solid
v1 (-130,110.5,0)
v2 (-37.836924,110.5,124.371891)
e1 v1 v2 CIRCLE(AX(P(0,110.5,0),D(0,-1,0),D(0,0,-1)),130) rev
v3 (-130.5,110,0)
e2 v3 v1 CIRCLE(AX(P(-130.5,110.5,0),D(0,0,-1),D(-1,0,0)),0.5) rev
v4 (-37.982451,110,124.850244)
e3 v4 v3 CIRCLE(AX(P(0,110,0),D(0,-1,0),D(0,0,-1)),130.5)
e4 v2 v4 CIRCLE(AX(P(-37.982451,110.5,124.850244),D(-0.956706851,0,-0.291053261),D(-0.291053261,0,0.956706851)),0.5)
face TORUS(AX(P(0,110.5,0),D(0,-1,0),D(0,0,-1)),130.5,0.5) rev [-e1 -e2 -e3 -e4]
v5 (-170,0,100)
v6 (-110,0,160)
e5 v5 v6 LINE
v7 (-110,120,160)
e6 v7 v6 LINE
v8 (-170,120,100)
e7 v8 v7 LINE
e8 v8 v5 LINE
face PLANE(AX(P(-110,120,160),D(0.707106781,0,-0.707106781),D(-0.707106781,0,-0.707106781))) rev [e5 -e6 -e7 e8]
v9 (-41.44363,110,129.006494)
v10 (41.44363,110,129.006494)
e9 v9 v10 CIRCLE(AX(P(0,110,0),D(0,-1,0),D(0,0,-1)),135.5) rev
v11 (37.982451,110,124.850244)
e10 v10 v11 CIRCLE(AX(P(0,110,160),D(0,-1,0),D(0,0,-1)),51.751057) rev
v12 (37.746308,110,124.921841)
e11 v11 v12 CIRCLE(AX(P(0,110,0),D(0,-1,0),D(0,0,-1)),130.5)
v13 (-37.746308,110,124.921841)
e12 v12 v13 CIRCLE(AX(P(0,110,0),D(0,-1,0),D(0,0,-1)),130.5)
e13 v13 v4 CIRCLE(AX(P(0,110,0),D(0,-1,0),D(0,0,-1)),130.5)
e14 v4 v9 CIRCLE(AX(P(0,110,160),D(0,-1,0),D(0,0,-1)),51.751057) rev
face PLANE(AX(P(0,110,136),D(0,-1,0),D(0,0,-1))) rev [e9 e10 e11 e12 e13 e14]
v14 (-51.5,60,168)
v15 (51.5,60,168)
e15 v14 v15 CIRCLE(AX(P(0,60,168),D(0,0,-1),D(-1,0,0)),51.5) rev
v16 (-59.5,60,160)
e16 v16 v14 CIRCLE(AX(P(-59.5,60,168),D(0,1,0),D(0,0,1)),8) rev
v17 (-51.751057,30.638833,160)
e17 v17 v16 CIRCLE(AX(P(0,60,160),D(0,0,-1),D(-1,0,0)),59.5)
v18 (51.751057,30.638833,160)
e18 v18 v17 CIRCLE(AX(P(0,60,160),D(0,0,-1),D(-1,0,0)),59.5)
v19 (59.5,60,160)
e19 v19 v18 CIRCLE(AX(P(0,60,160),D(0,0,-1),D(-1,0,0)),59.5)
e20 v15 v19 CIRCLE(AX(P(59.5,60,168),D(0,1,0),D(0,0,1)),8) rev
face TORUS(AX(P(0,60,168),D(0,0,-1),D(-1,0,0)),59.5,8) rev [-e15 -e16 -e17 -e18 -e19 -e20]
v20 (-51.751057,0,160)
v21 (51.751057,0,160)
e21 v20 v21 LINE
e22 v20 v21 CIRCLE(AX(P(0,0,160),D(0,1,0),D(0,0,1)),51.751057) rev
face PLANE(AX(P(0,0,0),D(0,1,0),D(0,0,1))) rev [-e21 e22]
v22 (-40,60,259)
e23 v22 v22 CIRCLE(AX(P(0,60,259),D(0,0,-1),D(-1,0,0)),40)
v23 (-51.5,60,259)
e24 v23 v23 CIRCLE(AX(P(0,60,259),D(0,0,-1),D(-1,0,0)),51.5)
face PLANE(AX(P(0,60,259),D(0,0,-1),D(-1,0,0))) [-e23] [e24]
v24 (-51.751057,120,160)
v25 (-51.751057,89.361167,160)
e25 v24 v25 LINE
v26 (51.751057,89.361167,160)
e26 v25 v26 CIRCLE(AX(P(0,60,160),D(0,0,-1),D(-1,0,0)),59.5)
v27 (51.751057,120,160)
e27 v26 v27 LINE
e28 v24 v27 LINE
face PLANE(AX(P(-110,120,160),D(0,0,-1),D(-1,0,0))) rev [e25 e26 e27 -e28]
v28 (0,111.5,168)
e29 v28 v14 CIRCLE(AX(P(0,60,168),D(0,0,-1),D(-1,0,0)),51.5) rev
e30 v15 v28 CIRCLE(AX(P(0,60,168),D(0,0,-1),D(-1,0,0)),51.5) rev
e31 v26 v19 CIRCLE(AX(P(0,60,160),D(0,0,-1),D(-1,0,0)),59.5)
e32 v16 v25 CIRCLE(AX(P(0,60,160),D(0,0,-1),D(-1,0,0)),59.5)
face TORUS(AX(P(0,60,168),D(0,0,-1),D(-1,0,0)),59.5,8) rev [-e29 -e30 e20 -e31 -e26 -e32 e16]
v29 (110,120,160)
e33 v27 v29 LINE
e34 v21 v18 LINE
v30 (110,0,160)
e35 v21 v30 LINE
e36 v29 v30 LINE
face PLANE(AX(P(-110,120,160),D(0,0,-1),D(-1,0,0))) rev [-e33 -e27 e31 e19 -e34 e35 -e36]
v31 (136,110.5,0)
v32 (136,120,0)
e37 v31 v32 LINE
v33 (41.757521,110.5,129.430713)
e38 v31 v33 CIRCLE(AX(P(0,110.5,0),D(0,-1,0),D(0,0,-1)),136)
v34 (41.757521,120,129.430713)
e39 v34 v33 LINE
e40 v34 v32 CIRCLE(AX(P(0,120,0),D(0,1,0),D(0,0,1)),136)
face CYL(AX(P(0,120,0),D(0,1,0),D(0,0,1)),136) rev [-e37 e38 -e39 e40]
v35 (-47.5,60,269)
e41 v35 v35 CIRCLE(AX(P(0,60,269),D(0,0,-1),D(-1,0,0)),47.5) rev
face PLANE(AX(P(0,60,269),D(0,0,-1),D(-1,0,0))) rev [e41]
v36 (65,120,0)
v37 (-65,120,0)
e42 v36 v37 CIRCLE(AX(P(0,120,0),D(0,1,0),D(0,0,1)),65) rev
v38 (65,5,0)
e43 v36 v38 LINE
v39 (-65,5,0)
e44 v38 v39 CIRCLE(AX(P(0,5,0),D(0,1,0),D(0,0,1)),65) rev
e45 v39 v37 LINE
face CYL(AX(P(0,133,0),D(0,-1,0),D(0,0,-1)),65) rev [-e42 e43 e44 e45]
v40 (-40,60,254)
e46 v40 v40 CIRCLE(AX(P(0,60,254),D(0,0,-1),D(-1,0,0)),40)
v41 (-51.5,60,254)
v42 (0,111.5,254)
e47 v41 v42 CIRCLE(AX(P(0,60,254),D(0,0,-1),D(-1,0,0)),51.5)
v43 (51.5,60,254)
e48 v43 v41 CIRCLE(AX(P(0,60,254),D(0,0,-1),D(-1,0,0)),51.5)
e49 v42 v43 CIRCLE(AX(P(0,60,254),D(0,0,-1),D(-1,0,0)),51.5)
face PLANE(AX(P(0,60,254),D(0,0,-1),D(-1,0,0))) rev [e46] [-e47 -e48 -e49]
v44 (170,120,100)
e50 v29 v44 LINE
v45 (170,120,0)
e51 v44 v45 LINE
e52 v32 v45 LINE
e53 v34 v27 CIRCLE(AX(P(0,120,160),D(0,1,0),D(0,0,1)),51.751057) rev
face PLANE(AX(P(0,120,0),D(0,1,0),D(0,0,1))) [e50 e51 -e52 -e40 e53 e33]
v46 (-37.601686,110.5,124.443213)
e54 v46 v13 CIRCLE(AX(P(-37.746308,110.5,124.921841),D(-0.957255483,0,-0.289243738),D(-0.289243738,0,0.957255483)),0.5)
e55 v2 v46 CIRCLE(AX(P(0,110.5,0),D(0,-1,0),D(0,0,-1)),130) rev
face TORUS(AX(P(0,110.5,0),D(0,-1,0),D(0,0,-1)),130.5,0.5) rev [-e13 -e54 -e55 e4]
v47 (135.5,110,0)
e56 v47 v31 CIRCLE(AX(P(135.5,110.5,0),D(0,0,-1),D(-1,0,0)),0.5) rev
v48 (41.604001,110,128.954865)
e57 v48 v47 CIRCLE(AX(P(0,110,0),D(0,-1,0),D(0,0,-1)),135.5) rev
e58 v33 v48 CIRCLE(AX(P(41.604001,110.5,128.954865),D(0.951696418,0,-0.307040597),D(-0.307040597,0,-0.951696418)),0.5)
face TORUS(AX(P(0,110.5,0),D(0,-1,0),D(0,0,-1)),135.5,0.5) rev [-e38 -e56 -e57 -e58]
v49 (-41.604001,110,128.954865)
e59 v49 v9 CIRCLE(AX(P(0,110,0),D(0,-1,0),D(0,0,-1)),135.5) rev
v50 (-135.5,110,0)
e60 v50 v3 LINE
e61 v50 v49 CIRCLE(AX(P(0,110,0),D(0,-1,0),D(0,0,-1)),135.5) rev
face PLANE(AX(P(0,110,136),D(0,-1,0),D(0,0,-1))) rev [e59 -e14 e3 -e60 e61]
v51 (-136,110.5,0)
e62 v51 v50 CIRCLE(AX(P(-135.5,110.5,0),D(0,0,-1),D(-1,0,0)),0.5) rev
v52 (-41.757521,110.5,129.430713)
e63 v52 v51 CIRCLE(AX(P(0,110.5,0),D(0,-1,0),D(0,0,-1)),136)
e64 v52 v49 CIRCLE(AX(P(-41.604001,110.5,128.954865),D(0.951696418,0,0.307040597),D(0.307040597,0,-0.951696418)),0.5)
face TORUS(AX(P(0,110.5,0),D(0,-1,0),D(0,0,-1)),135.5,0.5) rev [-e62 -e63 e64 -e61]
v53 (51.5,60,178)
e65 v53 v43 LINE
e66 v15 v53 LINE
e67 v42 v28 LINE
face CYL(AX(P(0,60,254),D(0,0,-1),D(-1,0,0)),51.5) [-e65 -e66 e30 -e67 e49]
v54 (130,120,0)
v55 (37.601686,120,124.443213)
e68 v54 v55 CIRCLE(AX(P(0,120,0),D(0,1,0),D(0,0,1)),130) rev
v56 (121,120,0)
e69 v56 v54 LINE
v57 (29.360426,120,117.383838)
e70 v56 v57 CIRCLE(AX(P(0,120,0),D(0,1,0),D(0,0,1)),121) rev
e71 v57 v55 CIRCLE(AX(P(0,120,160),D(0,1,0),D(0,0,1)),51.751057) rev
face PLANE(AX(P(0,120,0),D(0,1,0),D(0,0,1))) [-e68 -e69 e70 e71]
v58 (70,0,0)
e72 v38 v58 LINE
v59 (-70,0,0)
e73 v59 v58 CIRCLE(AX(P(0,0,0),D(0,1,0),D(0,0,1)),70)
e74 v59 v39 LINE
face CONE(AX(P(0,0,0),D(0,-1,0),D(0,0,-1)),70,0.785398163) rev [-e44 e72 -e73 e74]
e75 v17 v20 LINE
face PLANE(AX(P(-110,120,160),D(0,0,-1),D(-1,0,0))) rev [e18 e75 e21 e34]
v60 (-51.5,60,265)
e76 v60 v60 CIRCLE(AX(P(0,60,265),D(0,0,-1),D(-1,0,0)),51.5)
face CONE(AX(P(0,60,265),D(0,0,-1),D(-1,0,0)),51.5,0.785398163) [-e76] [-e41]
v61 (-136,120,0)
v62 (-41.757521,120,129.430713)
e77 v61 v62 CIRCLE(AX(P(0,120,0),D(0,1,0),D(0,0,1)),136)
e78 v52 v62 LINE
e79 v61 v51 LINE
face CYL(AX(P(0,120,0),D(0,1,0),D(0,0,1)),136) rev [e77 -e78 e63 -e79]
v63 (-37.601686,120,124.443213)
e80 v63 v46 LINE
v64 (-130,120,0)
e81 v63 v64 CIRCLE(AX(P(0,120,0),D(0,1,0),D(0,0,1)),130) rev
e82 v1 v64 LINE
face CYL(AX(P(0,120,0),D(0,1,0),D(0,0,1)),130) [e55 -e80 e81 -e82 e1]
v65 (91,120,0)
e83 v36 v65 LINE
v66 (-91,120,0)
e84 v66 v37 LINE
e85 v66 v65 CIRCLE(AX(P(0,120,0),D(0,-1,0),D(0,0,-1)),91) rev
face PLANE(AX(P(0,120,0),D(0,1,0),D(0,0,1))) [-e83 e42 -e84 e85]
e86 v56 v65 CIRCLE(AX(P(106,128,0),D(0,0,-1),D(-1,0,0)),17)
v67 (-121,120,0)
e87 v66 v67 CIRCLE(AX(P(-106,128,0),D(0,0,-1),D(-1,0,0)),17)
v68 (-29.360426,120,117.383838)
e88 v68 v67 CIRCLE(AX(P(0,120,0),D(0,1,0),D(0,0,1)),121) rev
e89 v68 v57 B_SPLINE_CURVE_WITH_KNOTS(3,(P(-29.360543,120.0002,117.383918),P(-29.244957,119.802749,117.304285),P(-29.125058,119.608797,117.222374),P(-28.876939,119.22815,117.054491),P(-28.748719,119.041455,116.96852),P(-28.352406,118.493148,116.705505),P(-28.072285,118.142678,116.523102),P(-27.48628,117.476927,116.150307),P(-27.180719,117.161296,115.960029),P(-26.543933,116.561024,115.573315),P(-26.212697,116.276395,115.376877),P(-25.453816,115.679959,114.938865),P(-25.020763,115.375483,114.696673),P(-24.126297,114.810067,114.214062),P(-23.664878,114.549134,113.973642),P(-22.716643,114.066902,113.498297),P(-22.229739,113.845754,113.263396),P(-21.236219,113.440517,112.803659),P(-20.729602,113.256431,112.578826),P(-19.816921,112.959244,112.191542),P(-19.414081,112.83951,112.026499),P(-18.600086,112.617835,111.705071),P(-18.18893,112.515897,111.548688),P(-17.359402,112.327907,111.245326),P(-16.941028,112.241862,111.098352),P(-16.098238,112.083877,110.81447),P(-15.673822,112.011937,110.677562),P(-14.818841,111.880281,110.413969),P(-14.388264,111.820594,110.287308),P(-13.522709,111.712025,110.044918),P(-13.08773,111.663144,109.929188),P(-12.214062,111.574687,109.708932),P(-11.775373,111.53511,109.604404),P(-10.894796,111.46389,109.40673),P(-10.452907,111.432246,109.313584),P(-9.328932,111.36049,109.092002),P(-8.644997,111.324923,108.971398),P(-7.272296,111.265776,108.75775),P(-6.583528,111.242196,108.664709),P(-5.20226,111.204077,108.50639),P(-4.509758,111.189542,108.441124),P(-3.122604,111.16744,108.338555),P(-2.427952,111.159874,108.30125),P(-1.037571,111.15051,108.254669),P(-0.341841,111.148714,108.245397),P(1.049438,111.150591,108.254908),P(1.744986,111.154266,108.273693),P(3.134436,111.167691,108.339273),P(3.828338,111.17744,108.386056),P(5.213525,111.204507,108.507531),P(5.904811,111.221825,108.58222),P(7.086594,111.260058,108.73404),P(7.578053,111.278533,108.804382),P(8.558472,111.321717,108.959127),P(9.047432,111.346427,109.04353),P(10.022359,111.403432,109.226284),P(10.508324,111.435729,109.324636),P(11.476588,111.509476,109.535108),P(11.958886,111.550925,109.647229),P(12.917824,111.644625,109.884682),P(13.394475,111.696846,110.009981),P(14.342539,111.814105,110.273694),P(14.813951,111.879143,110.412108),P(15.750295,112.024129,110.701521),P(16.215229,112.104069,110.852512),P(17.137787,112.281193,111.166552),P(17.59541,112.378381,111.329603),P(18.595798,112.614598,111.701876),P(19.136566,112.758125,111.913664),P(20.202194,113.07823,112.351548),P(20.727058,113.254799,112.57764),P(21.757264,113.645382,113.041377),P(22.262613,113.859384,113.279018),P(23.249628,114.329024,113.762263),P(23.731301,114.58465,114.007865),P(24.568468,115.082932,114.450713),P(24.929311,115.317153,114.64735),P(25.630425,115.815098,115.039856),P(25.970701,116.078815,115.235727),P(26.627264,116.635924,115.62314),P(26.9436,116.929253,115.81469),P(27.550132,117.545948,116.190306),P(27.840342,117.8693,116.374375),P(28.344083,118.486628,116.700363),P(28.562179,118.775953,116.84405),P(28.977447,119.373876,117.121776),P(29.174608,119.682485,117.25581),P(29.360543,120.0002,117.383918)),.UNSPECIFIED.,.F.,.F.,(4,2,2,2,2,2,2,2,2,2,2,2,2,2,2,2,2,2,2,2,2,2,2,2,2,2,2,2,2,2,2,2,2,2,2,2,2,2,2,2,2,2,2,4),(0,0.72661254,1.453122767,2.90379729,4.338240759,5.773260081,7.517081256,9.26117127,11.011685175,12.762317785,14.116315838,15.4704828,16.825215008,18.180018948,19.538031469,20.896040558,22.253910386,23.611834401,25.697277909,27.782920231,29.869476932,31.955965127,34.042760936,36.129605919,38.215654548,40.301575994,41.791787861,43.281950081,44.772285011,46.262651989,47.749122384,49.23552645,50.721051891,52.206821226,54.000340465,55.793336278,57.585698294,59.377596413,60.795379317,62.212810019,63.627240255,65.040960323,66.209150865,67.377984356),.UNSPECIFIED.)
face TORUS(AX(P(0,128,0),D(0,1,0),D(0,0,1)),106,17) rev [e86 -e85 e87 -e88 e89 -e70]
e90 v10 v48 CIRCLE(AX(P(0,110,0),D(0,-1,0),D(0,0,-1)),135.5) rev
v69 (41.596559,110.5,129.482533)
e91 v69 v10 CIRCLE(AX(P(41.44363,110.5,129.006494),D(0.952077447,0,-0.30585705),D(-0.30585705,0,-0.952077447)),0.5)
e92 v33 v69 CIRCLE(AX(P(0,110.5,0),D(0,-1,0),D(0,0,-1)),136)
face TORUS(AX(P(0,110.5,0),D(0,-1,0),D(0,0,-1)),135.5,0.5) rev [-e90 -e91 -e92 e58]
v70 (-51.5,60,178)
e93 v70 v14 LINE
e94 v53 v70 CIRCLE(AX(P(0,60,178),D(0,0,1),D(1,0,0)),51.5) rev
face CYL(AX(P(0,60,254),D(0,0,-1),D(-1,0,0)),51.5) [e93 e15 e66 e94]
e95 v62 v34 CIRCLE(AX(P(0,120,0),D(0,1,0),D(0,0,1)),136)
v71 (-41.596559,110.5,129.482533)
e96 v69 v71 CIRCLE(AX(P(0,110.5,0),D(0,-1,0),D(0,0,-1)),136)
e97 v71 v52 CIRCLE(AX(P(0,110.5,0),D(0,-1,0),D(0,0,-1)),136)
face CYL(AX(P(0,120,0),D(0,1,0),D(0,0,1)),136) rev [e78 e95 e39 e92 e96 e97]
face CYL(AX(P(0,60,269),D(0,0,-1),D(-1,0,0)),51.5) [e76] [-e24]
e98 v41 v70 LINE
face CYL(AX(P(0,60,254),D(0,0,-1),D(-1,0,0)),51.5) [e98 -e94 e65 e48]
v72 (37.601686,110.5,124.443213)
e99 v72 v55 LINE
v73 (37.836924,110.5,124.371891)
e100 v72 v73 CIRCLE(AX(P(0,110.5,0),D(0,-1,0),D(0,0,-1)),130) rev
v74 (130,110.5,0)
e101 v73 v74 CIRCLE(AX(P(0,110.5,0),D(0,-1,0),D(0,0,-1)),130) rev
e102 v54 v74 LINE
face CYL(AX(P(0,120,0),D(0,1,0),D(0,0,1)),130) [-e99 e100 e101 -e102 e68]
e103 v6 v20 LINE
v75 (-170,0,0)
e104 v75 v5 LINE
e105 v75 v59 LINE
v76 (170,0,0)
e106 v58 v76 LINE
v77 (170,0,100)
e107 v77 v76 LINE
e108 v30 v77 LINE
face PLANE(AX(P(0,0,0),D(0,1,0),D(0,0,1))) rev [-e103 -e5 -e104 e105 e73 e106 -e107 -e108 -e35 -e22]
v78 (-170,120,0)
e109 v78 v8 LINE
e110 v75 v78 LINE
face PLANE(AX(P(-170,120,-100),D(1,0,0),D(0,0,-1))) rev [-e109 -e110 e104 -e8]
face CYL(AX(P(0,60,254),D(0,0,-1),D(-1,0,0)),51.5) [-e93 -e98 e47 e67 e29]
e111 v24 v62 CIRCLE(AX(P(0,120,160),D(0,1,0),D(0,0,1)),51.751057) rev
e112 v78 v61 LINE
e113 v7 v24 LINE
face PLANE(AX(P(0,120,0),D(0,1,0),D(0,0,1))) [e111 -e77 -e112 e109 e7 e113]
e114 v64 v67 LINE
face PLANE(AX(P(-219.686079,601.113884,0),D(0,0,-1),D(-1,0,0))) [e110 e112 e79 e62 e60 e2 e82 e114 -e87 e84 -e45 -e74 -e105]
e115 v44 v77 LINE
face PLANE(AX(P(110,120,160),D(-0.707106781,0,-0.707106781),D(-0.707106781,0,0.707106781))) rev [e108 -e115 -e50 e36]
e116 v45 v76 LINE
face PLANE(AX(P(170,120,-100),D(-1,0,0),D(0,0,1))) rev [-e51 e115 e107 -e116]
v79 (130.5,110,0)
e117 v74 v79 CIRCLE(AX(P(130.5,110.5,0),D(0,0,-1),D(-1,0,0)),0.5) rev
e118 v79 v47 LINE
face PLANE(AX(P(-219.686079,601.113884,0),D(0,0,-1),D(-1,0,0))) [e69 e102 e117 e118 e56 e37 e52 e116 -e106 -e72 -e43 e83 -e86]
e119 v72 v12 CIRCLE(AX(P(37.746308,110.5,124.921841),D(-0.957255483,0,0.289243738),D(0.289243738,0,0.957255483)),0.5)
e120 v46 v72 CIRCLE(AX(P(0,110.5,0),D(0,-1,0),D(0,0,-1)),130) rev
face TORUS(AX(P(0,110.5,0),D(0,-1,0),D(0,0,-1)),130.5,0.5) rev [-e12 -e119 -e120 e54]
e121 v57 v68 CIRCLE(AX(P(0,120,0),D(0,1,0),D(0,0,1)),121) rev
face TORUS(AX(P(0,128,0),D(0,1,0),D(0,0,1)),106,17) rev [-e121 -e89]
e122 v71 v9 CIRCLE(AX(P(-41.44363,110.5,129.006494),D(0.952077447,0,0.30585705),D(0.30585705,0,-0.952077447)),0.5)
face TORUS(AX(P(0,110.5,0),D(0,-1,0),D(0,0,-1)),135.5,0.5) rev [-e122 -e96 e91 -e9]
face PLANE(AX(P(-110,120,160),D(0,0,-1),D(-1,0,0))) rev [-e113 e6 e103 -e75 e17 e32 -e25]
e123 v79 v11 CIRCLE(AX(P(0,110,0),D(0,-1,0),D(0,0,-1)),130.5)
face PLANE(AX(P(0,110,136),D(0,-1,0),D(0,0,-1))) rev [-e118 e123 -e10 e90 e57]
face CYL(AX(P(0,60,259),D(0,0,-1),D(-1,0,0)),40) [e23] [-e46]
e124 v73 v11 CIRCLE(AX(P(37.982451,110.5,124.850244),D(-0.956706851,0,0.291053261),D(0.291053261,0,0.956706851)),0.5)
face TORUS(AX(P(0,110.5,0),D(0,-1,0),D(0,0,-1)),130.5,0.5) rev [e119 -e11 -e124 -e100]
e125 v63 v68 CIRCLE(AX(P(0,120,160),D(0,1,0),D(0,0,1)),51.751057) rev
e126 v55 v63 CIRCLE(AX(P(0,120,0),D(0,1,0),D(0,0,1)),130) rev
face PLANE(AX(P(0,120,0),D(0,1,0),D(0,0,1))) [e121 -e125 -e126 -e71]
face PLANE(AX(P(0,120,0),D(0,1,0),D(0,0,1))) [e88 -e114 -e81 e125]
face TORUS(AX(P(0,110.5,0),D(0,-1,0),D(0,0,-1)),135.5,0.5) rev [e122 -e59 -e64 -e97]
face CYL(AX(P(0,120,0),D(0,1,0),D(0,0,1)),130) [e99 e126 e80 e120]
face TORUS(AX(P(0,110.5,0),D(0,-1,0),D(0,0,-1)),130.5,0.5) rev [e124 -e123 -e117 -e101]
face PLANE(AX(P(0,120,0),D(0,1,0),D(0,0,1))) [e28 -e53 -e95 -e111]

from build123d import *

# Parameters (mm, degrees)
MAIN_DEPTH                = 120
PERNO1_START              = 160
PERNO1_OUTLINE_R          = 51.5
PERNO1_DEPTH              = 94
PERNO1_2_OUTLINE_R        = 65
PERNO1_2_DEPTH            = 120
SANALATURAPERNO_START     = 254
SKETCH4_3_R               = 40
SANALATURAPERNO_DEPTH     = 5
PERNO2_START              = 259
SKETCH4_4_R               = 51.5
SKETCH4_4_R_2             = 40
PERNO2_DEPTH              = 10
CHAMFER1_SIZE             = 4
FILLET2_R                 = 8
CHAMFER1_OF_MIRROR14_SIZE = 4
FILLET2_OF_MIRROR14_R     = 8
CHAMFER2_SIZE             = 5
PISTA_R                   = 17
SKETCH9_W                 = 397.156797082
SKETCH9_H                 = 271.545663618
CUT_EXTRUDE4_DEPTH        = 120
FILLET3_R                 = 0.5


# Read off the part's stored shape, not the designer's step: Perno1
with BuildPart() as part:
    # MainBody → Main (new body)
    with BuildSketch(Plane(origin=(0, 0, 0), x_dir=(1, 0, 0), z_dir=(0, 1, 0))):
        Polygon((-110, 160), (110, 160), (170, 100), (170, -100), (110, -160), (-110, -160), (-170, -100), (-170, 100), align=None)
    extrude(amount=MAIN_DEPTH)

    # Perno1 outline → Perno1 (add)
    with BuildSketch(Plane.XY.offset(PERNO1_START)):
        with Locations((0, 60)):
            Circle(PERNO1_OUTLINE_R)
    perno1 = extrude(amount=PERNO1_DEPTH)

    # Perno1 2 outline → Perno1 2 (cut)
    with BuildSketch(Plane(origin=(0, 0, 0), x_dir=(1, 0, 0), z_dir=(0, 1, 0))):
        Circle(PERNO1_2_OUTLINE_R)
    perno1_2 = extrude(amount=PERNO1_2_DEPTH, mode=Mode.SUBTRACT)

    # Sketch4<3> → SanalaturaPerno (add)
    with BuildSketch(Plane.XY.offset(SANALATURAPERNO_START)):
        with Locations(Location((0, 60, 0), (0, 0, 180))):
            Circle(SKETCH4_3_R)
    sanalaturaperno = extrude(amount=SANALATURAPERNO_DEPTH)

    # Sketch4<4> → Perno2 (add)
    # profile 1 of 2: a face of its own
    with BuildSketch(Plane.XY.offset(PERNO2_START)):
        with Locations(Location((0, 60, 0), (0, 0, 180))):
            Circle(SKETCH4_4_R)
        with Locations(Location((0, 60, 0), (0, 0, 180))):
            Circle(SKETCH4_4_R_2, mode=Mode.SUBTRACT)
    # profile 2 of 2: a face of its own
    with BuildSketch(Plane.XY.offset(PERNO2_START)):
        with Locations(Location((0, 60, 0), (0, 0, 180))):
            Circle(SKETCH4_4_R_2)
    perno2 = extrude(amount=PERNO2_DEPTH)

    # Chamfer1
    chamfer1_edges = [part.edges().sort_by_distance(p)[0] for p in [
        (51.5, 60, 269),
    ]]
    chamfer(chamfer1_edges, length=CHAMFER1_SIZE)

    # Fillet2
    fillet2_edges = [part.edges().sort_by_distance(p)[0] for p in [
        (-51.5, 60, 160),
    ]]
    fillet(fillet2_edges, radius=FILLET2_R)

    # Mirror14: Perno1, Perno1 2, SanalaturaPerno, Perno2 across plane
    add(perno1.mirror(Plane.XY))
    add(perno1_2.mirror(Plane.XY), mode=Mode.SUBTRACT)
    add(sanalaturaperno.mirror(Plane.XY))
    add(perno2.mirror(Plane.XY))

    # Chamfer1 of Mirror14
    chamfer1_of_mirror14_edges = [part.edges().sort_by_distance(p)[0] for p in [
        (51.5, 60, -269),
    ]]
    chamfer(chamfer1_of_mirror14_edges, length=CHAMFER1_OF_MIRROR14_SIZE)

    # Fillet2 of Mirror14
    fillet2_of_mirror14_edges = [part.edges().sort_by_distance(p)[0] for p in [
        (-51.5, 60, -160),
    ]]
    fillet(fillet2_of_mirror14_edges, radius=FILLET2_OF_MIRROR14_R)

    # Chamfer2
    chamfer2_edges = [part.edges().sort_by_distance(p)[0] for p in [
        (-65, 0, 0),
    ]]
    chamfer(chamfer2_edges, length=CHAMFER2_SIZE)

    # Pista → PistaCut (revolve, cut)
    with BuildSketch(Plane.XY, mode=Mode.PRIVATE) as pistacut_sk:
        with Locations((106, 128)):
            Circle(PISTA_R)
    revolve(pistacut_sk.sketch.rotate(Axis((0, 120, 0), (0, -1, 0)), 90), axis=Axis((0, 120, 0), (0, -1, 0)), mode=Mode.SUBTRACT)

    # Sketch8 → Cut-Revolve2 (revolve, cut)
    with BuildSketch(Plane(origin=(0, 0, 0), x_dir=(0, 0, -1), z_dir=(1, 0, 0))):
        Polygon((-136, 141), (-136, 131), (-136, 120), (-136, 110), (-130, 110), (-130, 120), (-130, 124), (-130, 141), align=None)
    revolve(axis=Axis((0, 120, 0), (0, -1, 0)), mode=Mode.SUBTRACT)

    # Sketch9 → Cut-Extrude4 (cut)
    with BuildSketch(Plane(origin=(0, 0, 0), x_dir=(1, 0, 0), z_dir=(0, 1, 0))):
        with Locations((-21.107680821, 135.772831809)):
            Rectangle(SKETCH9_W, SKETCH9_H)
    extrude(amount=CUT_EXTRUDE4_DEPTH, mode=Mode.SUBTRACT)

    # Fillet3
    fillet3_edges = [part.edges().sort_by_distance(p)[0] for p in [
        (0, 110, 136),
        (0, 110, 136),
        (0, 110, 130),
        (0, 110, 130),
        (0, 110, 130),
        (0, 110, 136),
    ]]
    fillet(fillet3_edges, radius=FILLET3_R)


solid = part.part
